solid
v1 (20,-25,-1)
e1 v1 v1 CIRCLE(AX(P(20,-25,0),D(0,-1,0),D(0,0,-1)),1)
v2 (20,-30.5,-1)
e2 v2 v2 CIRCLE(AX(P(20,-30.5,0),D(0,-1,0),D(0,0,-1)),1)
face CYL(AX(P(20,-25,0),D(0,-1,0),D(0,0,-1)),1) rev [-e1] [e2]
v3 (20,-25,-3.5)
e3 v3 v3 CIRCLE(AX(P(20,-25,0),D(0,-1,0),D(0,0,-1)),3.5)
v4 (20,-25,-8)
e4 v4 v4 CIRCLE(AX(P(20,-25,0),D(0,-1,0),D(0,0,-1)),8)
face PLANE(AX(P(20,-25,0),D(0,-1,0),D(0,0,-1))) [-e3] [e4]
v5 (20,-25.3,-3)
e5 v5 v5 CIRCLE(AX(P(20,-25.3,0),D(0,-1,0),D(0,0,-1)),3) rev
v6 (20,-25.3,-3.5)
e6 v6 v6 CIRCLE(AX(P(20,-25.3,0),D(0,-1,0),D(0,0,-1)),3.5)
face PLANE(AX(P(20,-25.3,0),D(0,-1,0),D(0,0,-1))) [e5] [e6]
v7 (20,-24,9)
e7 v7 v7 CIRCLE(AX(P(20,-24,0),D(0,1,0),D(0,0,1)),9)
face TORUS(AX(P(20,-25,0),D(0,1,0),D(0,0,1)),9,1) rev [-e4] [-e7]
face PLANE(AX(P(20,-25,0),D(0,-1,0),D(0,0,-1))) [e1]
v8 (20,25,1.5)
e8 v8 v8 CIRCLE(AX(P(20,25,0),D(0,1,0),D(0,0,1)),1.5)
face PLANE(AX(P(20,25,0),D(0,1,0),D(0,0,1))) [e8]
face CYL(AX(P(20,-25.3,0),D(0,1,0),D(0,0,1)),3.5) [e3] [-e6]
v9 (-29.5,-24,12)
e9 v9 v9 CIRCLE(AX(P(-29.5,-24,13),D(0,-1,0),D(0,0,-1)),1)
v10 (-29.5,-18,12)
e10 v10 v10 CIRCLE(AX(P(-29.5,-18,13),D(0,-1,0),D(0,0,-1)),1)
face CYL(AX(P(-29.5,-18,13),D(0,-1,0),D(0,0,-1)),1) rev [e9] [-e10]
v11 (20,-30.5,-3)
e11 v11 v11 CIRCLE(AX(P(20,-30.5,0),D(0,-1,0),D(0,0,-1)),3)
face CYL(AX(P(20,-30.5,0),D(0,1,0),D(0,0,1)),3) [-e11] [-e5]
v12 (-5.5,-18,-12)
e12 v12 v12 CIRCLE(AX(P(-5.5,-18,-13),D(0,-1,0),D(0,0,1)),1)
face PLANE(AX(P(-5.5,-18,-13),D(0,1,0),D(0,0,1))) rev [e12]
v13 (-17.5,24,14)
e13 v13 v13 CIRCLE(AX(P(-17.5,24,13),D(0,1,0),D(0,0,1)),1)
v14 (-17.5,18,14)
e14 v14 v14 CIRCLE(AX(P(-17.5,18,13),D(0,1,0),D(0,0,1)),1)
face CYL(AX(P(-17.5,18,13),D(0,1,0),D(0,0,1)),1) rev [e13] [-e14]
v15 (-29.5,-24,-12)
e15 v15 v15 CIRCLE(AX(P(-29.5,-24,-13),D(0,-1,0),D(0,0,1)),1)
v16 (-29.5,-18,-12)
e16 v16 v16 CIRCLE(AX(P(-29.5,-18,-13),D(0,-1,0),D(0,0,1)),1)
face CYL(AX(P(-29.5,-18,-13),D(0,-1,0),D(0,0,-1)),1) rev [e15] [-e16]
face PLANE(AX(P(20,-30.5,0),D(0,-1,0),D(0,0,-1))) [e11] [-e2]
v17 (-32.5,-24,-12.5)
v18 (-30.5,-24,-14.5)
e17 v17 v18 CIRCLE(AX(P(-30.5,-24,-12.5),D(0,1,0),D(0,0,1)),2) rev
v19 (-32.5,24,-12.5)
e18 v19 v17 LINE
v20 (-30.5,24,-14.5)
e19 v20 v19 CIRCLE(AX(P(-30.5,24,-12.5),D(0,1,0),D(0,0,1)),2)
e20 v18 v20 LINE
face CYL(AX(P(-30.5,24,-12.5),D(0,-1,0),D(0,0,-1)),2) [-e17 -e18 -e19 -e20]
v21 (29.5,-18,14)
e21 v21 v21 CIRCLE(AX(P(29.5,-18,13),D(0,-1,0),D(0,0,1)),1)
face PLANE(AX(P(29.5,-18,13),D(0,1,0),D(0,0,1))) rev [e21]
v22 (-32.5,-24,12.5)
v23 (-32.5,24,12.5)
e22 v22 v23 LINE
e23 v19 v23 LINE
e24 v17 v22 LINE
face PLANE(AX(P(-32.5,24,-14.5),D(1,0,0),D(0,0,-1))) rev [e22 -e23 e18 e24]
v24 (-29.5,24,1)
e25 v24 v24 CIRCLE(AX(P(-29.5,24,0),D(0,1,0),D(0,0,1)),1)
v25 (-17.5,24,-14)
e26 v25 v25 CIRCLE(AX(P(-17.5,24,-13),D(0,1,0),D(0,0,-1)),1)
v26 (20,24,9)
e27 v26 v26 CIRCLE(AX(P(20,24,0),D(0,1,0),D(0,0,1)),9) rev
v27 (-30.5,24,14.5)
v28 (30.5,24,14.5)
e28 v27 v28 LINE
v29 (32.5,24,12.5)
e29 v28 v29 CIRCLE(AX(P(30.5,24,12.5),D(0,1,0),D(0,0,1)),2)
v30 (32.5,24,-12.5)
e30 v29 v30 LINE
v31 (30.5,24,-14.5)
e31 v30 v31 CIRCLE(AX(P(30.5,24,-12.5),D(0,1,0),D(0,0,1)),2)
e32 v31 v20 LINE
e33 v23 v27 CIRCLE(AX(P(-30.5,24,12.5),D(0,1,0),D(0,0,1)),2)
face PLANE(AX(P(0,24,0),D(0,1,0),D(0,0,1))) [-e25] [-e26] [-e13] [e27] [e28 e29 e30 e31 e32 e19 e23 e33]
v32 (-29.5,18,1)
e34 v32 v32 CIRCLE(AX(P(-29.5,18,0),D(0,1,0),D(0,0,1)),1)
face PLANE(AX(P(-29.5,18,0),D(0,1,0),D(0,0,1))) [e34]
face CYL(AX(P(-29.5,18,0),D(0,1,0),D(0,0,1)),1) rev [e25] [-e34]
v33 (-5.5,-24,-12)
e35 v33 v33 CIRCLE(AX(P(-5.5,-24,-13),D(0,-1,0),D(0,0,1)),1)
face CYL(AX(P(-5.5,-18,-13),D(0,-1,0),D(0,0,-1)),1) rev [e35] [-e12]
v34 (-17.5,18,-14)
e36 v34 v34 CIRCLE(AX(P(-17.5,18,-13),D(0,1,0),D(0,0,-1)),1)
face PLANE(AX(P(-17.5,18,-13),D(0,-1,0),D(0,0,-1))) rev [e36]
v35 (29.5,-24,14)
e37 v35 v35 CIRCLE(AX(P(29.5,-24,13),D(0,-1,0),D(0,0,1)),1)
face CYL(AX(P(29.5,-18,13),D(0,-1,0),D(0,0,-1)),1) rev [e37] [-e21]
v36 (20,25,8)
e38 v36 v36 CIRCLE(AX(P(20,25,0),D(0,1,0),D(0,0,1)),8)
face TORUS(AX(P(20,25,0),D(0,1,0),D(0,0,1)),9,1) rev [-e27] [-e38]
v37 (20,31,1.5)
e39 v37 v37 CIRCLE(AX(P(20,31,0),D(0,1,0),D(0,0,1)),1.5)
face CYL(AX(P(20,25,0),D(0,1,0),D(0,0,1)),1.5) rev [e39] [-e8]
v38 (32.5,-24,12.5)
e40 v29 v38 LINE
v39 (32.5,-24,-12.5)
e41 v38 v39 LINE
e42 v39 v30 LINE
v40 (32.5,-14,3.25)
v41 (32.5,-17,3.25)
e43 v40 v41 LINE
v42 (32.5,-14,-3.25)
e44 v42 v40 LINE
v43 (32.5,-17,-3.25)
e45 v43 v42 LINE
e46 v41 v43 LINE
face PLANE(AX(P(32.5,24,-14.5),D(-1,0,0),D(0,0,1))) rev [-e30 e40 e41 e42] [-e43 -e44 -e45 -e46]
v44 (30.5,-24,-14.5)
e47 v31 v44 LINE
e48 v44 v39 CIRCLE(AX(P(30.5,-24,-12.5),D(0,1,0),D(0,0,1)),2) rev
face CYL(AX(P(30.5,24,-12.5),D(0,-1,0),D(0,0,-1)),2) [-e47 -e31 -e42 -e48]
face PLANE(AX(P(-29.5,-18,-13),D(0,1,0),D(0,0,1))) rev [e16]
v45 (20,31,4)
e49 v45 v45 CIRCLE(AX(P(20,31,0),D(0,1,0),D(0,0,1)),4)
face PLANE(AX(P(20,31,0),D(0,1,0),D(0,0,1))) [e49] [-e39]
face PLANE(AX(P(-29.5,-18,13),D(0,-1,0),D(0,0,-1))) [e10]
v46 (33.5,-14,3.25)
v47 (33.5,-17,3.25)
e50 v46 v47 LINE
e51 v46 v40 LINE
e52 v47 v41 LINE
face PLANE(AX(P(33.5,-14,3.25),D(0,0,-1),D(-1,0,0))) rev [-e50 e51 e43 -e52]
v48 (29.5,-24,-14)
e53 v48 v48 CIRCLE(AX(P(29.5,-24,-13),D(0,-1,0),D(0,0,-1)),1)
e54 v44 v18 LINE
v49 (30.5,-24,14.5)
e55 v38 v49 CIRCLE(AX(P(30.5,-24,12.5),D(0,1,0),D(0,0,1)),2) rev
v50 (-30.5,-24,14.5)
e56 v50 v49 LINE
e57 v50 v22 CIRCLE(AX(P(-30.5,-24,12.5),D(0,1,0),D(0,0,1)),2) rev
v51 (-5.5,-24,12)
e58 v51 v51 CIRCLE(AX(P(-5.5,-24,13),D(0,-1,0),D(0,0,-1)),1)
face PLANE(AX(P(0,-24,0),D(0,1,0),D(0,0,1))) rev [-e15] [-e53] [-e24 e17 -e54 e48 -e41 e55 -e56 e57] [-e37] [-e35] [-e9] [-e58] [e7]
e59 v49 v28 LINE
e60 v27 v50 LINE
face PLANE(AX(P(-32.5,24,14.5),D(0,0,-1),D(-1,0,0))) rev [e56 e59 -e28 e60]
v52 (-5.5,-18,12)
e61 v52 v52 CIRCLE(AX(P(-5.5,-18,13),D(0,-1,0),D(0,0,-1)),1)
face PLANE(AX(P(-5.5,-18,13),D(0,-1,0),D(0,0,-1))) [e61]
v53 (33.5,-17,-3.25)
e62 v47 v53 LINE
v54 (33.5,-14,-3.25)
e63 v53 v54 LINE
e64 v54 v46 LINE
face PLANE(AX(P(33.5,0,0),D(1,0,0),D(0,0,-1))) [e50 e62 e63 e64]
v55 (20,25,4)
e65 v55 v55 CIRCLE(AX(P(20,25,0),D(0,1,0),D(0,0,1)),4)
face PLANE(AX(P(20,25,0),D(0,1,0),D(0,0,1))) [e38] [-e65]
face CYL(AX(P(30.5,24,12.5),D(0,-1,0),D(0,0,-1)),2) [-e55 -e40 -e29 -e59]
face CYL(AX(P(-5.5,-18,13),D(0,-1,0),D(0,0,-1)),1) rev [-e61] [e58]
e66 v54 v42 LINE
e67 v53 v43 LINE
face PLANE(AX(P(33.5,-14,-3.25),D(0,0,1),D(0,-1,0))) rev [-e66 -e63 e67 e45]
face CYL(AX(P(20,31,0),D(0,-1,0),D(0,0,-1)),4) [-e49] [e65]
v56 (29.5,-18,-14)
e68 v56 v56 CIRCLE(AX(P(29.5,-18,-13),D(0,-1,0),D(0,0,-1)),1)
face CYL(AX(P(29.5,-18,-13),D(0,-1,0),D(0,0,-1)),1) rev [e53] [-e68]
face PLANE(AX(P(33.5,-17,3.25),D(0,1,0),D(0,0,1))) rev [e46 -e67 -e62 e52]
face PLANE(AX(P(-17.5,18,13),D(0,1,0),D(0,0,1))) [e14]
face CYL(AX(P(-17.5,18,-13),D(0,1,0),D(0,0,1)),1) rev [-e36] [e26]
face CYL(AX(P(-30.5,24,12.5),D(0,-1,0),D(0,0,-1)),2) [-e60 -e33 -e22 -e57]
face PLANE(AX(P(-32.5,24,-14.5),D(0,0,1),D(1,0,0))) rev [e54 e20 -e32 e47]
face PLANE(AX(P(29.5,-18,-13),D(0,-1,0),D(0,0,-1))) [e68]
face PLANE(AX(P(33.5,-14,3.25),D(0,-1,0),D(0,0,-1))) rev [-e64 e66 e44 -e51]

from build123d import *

# Parameters (mm, degrees)
SKETCH_2_W          = 65
SKETCH_2_H          = 29
EXTRUDE_1_DEPTH     = 24
FILLET_1_R          = 2
SKETCH_3_R          = 1
CUT_EXTRUDE_1_DEPTH = 6
SKETCH_4_R          = 8
EXTRUDE_2_DEPTH     = 1
FILLET_2_R          = 1
SKETCH_5_R          = 4
EXTRUDE_3_DEPTH     = 6
SKETCH_6_R          = 1
CUT_EXTRUDE_2_DEPTH = 6
EXTRUDE_START       = 1
SKETCH_7_R          = 8
EXTRUDE_4_DEPTH     = 1
FILLET_3_R          = 1
SKETCH_8_R          = 3.5
EXTRUDE_5_DEPTH     = 0.3
SKETCH_9_R          = 3
EXTRUDE_6_DEPTH     = 5.5
SKETCH_10_R         = 1
CUT_EXTRUDE_3_DEPTH = 5.5
SKETCH_11_W         = 6.5
SKETCH_11_H         = 3
EXTRUDE_7_DEPTH     = 1
SKETCH_12_R         = 1.5
CUT_EXTRUDE_4_DEPTH = 6


with BuildPart() as part:
    # ｽｹｯﾁ2 → ﾎﾞｽ - 押し出し1 (new, symmetric)
    with BuildSketch(Plane(origin=(0, 0, 0), x_dir=(1, 0, 0), z_dir=(0, 1, 0))):
        Rectangle(SKETCH_2_W, SKETCH_2_H)
    extrude(amount=EXTRUDE_1_DEPTH, both=True)

    # ﾌｨﾚｯﾄ1
    fillet_1_edges = [part.edges().sort_by_distance(p)[0] for p in [
        (32.5, 0, 14.5),
        (-32.5, 0, 14.5),
        (-32.5, 0, -14.5),
        (32.5, 0, -14.5),
    ]]
    fillet(fillet_1_edges, radius=FILLET_1_R)

    # ｽｹｯﾁ3 → ｶｯﾄ - 押し出し1 (cut)
    with BuildSketch(Plane(origin=(0, 24, 0), x_dir=(1, 0, 0), z_dir=(0, 1, 0))):
        with Locations(Location((-29.5, 0, 0), (0, 0, 270))):
            Circle(SKETCH_3_R)
        with Locations(Location((-17.5, -13, 0), (0, 0, 270))):
            Circle(SKETCH_3_R)
        with Locations(Location((-17.5, 13, 0), (0, 0, 90))):
            Circle(SKETCH_3_R)
    extrude(amount=-CUT_EXTRUDE_1_DEPTH, mode=Mode.SUBTRACT)

    # ｽｹｯﾁ4 → ﾎﾞｽ - 押し出し2 (add)
    with BuildSketch(Plane(origin=(0, 24, 0), x_dir=(1, 0, 0), z_dir=(0, 1, 0))):
        with Locations(Location((20, 0, 0), (0, 0, 270))):
            Circle(SKETCH_4_R)
    extrude(amount=EXTRUDE_2_DEPTH)

    # ﾌｨﾚｯﾄ2
    fillet_2_edges = [part.edges().sort_by_distance(p)[0] for p in [
        (20, 24, -8),
    ]]
    fillet(fillet_2_edges, radius=FILLET_2_R - 0.0001)  # a hair under: the kernel refuses the full size

    # ｽｹｯﾁ5 → ﾎﾞｽ - 押し出し3 (add)
    with BuildSketch(Plane(origin=(0, 25, 0), x_dir=(1, 0, 0), z_dir=(0, 1, 0))):
        with Locations(Location((20, 0, 0), (0, 0, 270))):
            Circle(SKETCH_5_R)
    extrude(amount=EXTRUDE_3_DEPTH)

    # ｽｹｯﾁ6 → ｶｯﾄ - 押し出し2 (cut)
    with BuildSketch(Plane.XZ.offset(24)):
        with Locations(Location((-29.5, 13, 0), (0, 0, 270))):
            Circle(SKETCH_6_R)
        with Locations(Location((-29.5, -13, 0), (0, 0, 90))):
            Circle(SKETCH_6_R)
        with Locations(Location((29.5, -13, 0), (0, 0, 270))):
            Circle(SKETCH_6_R)
        with Locations(Location((29.5, 13, 0), (0, 0, 90))):
            Circle(SKETCH_6_R)
        with Locations(Location((-5.5, 13, 0), (0, 0, 270))):
            Circle(SKETCH_6_R)
        with Locations(Location((-5.5, -13, 0), (0, 0, 90))):
            Circle(SKETCH_6_R)
    extrude(amount=-CUT_EXTRUDE_2_DEPTH, mode=Mode.SUBTRACT)

    # ｽｹｯﾁ7 → ﾎﾞｽ - 押し出し4 (add)
    with BuildSketch(Plane.XZ.offset(24).offset(EXTRUDE_START)):
        with Locations(Location((20, 0, 0), (0, 0, 90))):
            Circle(SKETCH_7_R)
    extrude(amount=-EXTRUDE_4_DEPTH)

    # ﾌｨﾚｯﾄ3
    fillet_3_edges = [part.edges().sort_by_distance(p)[0] for p in [
        (20, -24, -8),
    ]]
    fillet(fillet_3_edges, radius=FILLET_3_R - 0.0001)  # a hair under: the kernel refuses the full size

    # ｽｹｯﾁ8 → ﾎﾞｽ - 押し出し5 (add)
    with BuildSketch(Plane.XZ.offset(25)):
        with Locations(Location((20, 0, 0), (0, 0, 270))):
            Circle(SKETCH_8_R)
    extrude(amount=EXTRUDE_5_DEPTH)

    # ｽｹｯﾁ9 → ﾎﾞｽ - 押し出し6 (add)
    with BuildSketch(Plane.XZ.offset(25)):
        with Locations(Location((20, 0, 0), (0, 0, 270))):
            Circle(SKETCH_9_R)
    extrude(amount=EXTRUDE_6_DEPTH)

    # ｽｹｯﾁ10 → ｶｯﾄ - 押し出し3 (cut)
    with BuildSketch(Plane.XZ.offset(30.5)):
        with Locations(Location((20, 0, 0), (0, 0, 270))):
            Circle(SKETCH_10_R)
    extrude(amount=-CUT_EXTRUDE_3_DEPTH, mode=Mode.SUBTRACT)

    # ｽｹｯﾁ11 → ﾎﾞｽ - 押し出し7 (add)
    with BuildSketch(Plane(origin=(32.5, 0, 0), x_dir=(0, 0, -1), z_dir=(1, 0, 0))):
        with Locations((0, -15.5)):
            Rectangle(SKETCH_11_W, SKETCH_11_H)
    extrude(amount=EXTRUDE_7_DEPTH)

    # ｽｹｯﾁ12 → ｶｯﾄ - 押し出し4 (cut)
    with BuildSketch(Plane(origin=(0, 31, 0), x_dir=(1, 0, 0), z_dir=(0, 1, 0))):
        with Locations(Location((20, 0, 0), (0, 0, 270))):
            Circle(SKETCH_12_R)
    extrude(amount=-CUT_EXTRUDE_4_DEPTH, mode=Mode.SUBTRACT)


solid = part.part
